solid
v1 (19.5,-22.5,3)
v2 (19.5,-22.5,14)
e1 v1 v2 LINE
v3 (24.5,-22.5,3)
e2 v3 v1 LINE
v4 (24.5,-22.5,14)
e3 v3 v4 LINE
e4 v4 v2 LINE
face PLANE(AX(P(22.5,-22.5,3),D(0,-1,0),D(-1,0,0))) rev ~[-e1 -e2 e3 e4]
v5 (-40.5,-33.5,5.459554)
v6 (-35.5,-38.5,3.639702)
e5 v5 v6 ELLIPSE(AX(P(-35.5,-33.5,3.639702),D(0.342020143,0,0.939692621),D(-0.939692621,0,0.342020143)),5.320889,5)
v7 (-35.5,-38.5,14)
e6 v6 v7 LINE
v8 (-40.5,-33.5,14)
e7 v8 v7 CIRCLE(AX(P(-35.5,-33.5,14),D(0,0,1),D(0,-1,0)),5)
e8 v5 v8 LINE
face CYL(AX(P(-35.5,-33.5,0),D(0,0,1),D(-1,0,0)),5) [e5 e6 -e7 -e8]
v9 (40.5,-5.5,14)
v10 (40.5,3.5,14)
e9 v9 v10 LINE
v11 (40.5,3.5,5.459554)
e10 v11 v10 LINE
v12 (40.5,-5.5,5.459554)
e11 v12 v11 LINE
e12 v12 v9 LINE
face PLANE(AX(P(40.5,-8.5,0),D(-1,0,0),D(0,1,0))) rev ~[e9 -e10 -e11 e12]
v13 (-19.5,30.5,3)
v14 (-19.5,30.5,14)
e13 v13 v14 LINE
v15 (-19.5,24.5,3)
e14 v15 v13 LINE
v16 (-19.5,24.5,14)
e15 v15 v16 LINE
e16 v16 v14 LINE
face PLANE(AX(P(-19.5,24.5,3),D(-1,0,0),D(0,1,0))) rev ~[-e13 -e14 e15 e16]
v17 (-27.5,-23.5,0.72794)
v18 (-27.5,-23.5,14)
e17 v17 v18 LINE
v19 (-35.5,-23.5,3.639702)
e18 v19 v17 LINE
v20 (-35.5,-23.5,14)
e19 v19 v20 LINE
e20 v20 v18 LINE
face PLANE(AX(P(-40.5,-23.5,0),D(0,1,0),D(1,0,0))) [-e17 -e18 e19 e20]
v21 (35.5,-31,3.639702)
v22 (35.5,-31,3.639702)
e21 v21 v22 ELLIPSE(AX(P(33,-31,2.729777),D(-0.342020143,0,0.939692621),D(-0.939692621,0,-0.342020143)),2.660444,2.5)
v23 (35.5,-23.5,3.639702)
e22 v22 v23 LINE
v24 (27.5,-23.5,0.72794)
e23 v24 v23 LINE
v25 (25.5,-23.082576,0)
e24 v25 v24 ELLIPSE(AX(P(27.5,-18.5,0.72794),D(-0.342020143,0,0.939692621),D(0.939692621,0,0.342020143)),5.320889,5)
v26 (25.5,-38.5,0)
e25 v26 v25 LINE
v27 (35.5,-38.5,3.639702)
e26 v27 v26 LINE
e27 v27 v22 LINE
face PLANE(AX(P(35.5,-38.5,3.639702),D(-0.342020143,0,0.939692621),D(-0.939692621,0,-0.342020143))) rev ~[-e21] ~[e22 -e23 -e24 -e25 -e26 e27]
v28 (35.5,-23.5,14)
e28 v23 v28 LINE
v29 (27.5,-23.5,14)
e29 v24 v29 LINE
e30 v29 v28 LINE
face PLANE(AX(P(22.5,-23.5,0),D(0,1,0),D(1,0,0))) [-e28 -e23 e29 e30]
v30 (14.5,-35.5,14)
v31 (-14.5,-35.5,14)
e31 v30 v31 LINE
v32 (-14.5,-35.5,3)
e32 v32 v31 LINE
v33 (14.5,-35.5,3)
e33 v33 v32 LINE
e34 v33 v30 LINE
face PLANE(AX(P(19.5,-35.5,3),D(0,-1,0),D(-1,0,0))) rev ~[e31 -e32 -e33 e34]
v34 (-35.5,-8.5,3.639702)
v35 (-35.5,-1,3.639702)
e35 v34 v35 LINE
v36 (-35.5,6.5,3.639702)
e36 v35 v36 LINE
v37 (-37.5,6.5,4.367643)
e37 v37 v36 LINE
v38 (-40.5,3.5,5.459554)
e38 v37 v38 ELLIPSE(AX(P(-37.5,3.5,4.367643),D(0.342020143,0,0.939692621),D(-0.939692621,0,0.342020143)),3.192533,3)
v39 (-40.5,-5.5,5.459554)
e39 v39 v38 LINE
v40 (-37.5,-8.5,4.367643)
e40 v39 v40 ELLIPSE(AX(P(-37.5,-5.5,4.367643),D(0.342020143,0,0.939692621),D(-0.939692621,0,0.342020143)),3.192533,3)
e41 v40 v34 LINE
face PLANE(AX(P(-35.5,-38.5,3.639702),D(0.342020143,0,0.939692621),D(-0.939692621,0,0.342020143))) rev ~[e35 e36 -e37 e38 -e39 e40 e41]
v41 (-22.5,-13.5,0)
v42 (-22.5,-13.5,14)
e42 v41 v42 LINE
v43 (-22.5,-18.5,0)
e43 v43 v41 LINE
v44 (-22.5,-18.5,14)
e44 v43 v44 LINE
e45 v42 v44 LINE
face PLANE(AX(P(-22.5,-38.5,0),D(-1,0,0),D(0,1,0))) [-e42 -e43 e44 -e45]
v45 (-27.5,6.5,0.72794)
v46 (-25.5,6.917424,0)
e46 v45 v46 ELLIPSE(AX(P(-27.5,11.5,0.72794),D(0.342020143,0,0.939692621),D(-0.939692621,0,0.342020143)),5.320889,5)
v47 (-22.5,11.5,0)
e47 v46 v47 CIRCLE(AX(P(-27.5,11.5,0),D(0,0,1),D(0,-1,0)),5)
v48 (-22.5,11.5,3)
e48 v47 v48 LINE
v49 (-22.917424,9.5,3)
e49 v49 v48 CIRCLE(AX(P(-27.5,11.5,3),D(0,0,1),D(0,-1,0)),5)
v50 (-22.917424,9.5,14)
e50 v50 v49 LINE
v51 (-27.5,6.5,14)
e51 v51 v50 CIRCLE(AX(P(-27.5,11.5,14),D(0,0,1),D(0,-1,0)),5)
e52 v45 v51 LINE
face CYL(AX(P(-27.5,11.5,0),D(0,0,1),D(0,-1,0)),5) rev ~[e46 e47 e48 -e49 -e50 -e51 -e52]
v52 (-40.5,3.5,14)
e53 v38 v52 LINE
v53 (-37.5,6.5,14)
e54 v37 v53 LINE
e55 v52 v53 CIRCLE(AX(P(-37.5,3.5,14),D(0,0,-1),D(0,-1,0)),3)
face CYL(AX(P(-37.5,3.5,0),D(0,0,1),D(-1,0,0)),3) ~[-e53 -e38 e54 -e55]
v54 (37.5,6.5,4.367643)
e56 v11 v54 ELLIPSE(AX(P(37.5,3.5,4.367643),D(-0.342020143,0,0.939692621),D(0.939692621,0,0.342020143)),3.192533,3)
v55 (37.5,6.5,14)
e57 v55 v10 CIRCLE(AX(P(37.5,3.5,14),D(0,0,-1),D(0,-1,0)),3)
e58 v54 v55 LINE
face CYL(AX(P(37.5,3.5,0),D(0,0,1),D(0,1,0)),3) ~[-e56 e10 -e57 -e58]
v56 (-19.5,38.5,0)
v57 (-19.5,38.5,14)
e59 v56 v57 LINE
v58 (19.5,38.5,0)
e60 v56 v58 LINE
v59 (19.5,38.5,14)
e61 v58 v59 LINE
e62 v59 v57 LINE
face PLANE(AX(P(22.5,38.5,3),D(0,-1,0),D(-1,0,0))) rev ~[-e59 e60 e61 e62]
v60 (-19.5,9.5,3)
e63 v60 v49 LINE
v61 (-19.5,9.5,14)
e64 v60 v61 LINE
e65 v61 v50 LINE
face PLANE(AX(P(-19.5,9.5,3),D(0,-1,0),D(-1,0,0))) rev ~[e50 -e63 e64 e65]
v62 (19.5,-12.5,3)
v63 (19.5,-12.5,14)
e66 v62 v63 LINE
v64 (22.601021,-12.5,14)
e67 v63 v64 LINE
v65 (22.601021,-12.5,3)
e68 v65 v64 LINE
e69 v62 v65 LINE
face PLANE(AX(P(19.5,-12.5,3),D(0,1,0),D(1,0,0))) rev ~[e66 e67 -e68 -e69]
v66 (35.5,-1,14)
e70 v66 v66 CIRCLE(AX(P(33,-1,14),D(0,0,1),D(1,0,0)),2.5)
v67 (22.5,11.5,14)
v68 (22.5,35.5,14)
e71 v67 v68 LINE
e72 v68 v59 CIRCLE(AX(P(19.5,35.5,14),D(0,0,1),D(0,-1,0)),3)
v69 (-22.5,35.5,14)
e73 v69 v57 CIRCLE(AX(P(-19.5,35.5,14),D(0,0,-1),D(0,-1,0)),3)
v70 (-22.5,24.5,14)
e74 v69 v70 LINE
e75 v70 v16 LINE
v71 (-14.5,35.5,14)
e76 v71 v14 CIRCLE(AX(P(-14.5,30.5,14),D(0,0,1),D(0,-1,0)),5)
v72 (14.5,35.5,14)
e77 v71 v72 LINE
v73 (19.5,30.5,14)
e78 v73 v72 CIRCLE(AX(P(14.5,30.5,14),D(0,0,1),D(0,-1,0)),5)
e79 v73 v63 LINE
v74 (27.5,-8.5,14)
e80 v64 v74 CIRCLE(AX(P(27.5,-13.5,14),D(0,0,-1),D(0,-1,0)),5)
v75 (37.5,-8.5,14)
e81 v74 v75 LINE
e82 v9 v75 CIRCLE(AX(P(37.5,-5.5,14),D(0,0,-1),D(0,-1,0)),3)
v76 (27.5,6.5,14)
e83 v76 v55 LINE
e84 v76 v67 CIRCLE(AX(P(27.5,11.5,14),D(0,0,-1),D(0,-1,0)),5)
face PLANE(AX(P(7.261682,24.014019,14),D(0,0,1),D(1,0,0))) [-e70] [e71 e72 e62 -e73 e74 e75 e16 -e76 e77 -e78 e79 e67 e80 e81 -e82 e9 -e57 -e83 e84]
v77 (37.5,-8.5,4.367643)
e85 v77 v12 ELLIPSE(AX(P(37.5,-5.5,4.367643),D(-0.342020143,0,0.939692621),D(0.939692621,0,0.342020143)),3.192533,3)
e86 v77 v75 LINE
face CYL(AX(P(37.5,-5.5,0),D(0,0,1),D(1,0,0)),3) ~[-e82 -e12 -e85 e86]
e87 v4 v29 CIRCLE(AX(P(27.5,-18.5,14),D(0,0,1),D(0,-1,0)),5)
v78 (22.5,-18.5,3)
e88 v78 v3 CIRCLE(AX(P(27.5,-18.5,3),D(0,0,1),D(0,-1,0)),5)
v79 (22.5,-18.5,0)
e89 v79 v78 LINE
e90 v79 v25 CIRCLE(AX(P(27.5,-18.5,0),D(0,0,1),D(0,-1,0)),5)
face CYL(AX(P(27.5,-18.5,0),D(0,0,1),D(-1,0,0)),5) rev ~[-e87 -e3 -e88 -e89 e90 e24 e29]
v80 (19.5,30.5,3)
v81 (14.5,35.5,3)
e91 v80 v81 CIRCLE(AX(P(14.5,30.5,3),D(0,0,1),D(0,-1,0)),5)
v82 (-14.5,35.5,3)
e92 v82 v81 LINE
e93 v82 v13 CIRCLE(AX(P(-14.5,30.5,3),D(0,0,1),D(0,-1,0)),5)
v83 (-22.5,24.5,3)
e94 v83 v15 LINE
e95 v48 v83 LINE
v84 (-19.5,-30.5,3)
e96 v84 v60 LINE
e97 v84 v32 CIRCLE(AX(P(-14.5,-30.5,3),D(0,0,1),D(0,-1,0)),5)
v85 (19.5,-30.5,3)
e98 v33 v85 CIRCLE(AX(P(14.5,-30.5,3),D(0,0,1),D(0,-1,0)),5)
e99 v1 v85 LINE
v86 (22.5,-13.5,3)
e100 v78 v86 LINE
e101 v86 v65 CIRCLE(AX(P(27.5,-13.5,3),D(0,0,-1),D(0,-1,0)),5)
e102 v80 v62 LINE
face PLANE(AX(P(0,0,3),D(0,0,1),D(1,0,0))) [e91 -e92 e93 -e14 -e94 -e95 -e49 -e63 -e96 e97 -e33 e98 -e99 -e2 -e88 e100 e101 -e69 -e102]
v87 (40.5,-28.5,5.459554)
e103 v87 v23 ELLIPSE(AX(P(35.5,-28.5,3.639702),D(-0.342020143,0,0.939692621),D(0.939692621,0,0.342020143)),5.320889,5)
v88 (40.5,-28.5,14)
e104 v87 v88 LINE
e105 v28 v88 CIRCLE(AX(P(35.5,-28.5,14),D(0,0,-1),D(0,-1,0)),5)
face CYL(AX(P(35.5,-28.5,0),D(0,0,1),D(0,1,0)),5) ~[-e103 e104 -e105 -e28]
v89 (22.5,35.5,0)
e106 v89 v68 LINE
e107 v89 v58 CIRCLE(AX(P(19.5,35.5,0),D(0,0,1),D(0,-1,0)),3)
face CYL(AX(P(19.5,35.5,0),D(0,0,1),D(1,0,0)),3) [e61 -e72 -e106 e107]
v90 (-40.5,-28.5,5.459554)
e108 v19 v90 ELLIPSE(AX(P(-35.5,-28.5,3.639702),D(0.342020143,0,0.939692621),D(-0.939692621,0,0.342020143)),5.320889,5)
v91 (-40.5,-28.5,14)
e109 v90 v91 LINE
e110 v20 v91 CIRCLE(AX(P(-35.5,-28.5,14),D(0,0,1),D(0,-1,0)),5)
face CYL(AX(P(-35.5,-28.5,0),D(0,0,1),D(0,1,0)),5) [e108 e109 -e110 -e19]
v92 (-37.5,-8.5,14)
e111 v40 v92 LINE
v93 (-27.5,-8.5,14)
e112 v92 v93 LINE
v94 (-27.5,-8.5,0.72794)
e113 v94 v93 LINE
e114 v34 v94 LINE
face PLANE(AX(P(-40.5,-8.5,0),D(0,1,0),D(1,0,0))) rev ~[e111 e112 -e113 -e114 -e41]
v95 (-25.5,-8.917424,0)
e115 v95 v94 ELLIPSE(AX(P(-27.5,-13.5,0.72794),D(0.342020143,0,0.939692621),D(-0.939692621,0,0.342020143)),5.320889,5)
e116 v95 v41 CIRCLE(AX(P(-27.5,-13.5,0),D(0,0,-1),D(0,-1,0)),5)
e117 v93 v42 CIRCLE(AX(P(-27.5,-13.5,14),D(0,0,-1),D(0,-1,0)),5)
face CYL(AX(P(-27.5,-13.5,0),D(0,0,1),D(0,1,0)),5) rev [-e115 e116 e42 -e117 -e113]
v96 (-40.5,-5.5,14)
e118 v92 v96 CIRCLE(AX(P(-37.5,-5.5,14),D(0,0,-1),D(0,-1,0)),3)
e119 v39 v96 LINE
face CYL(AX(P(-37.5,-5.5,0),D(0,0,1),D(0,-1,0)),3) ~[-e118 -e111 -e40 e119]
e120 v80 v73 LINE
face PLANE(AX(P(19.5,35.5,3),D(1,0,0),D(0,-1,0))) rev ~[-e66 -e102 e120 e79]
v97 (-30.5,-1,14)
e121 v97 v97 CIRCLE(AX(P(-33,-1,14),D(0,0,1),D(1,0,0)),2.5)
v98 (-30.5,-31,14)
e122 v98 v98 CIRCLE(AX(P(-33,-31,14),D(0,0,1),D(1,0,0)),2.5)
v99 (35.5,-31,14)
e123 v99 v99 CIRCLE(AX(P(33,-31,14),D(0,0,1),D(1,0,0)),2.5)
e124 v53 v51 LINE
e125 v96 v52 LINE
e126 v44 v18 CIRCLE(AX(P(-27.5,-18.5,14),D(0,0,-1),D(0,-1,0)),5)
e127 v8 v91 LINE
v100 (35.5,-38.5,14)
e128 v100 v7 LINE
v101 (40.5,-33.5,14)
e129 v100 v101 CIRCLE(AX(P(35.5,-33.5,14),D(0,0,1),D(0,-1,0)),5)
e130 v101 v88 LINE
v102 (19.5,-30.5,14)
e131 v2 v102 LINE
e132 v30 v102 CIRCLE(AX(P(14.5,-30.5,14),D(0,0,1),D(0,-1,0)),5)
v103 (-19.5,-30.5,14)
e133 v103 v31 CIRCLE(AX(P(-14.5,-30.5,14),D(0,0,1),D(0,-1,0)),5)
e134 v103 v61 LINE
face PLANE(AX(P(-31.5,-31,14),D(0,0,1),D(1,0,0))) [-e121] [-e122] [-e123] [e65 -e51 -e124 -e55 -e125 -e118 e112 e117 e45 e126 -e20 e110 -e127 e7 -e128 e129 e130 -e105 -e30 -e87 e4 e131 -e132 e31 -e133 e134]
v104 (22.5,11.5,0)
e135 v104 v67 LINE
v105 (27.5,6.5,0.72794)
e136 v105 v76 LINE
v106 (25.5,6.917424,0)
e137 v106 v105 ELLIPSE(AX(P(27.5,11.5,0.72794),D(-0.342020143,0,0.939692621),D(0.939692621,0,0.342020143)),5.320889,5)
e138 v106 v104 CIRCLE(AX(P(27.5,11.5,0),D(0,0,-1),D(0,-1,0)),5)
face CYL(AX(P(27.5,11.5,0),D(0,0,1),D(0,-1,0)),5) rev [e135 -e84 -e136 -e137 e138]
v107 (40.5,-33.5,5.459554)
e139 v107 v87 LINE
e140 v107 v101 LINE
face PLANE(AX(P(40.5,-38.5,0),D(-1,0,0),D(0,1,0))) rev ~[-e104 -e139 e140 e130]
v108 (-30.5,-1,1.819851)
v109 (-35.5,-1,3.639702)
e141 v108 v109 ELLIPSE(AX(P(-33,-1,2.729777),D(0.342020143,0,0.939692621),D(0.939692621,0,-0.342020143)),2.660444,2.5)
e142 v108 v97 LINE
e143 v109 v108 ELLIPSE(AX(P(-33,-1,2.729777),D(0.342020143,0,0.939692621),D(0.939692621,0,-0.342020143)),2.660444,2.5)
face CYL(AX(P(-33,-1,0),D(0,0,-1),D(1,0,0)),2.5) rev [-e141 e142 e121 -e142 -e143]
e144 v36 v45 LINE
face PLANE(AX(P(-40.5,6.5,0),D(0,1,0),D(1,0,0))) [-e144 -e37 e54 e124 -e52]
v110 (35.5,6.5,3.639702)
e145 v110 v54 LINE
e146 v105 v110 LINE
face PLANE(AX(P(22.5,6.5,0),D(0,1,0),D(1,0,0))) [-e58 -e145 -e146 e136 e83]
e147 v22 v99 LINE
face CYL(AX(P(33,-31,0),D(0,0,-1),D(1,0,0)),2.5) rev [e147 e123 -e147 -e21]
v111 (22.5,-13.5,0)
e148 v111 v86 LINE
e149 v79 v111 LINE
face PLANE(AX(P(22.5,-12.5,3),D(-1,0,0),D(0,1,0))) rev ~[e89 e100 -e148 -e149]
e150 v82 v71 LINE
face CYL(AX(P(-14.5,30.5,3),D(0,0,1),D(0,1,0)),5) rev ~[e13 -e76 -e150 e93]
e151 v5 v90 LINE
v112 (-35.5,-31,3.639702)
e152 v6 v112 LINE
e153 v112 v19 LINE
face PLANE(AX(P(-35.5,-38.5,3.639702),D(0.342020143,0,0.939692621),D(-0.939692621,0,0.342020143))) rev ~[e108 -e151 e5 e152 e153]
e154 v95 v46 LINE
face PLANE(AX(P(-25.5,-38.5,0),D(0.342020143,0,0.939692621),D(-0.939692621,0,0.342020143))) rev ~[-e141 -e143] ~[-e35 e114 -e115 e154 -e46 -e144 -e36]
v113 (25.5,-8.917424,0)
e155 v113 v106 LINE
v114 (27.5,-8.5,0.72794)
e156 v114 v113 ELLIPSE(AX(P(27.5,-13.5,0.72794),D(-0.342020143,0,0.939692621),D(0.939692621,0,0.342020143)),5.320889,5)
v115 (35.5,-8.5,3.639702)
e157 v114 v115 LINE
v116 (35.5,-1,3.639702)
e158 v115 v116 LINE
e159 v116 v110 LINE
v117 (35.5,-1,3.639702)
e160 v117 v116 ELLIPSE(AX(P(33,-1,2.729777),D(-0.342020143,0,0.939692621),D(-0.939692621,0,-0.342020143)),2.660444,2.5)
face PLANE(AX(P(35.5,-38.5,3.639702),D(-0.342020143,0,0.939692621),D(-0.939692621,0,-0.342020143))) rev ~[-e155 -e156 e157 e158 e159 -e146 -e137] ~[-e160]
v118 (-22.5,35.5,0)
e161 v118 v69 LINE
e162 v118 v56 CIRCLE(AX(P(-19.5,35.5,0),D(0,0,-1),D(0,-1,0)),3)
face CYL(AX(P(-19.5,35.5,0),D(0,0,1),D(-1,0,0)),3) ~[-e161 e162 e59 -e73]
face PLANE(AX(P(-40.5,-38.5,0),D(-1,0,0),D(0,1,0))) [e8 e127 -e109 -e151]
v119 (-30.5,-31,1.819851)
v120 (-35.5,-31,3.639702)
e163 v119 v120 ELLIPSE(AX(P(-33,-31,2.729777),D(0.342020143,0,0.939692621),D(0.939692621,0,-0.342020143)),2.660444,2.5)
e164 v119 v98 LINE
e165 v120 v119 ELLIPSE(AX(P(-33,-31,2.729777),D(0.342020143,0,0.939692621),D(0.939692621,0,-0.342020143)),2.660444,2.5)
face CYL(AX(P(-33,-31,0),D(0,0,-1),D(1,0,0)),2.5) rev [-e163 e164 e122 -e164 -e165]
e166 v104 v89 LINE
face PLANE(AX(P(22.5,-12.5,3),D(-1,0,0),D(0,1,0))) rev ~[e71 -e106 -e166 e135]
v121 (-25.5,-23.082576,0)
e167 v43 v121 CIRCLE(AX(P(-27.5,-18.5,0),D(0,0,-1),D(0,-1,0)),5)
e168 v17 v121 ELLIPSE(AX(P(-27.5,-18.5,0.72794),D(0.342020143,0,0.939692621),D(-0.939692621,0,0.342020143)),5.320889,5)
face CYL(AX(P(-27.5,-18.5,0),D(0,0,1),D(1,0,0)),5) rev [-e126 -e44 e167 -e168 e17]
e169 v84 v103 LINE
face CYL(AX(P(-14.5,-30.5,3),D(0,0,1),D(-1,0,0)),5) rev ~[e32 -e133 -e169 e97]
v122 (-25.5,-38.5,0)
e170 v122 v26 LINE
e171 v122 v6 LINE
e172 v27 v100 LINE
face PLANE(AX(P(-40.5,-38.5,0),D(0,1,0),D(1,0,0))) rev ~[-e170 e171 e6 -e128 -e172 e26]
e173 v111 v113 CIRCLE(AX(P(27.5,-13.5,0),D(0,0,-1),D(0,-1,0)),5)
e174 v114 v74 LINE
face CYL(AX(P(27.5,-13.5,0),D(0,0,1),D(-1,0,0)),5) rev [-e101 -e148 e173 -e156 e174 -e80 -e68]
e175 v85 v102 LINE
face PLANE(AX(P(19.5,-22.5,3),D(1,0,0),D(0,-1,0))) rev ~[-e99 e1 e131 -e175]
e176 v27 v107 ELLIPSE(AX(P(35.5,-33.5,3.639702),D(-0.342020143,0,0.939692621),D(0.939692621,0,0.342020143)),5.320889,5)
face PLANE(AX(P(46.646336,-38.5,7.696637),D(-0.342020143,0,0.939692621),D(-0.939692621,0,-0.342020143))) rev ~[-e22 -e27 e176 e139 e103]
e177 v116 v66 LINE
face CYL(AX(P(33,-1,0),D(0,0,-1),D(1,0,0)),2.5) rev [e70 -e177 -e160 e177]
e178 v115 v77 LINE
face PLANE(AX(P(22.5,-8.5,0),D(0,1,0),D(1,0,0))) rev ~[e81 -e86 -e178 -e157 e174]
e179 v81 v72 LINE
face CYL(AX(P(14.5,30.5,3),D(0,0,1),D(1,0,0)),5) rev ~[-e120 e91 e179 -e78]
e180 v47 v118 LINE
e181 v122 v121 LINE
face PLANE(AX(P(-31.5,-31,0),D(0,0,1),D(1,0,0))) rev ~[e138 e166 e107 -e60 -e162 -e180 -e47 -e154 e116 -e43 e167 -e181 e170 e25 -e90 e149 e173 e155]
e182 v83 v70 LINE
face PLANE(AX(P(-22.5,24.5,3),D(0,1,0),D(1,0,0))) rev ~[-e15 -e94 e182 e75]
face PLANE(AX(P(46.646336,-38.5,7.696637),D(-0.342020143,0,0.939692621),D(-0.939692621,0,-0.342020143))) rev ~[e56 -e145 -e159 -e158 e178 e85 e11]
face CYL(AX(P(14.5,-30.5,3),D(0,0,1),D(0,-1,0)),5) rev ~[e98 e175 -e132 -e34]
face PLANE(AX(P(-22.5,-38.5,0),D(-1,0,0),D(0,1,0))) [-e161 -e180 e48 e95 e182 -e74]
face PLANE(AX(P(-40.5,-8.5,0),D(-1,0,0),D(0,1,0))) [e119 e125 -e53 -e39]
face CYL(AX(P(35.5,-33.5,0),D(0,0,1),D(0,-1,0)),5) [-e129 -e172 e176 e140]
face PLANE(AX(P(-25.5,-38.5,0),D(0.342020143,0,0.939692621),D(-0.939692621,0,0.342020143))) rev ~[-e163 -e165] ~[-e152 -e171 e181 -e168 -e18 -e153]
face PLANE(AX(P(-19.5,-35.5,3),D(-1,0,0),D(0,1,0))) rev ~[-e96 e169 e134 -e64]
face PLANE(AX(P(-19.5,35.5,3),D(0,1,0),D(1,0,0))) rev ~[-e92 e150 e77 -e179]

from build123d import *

# Parameters (mm, degrees)
F0_W      = 45
F0_H      = 77
F1_DEPTH  = 3
F4_DEPTH  = 11
F5_W      = 18
F5_H      = 15
F5_R      = 2.5
F6_DEPTH  = 14
F7_R      = 3
F8_R      = 5
F9_R      = 5
F11_DEPTH = 77.001


# Not quite as in the source:
# - a feature names something its author has since deleted; it is built from what else it names


with BuildPart() as f1:
    # F0 (on Top) → F1 (new body)
    with BuildSketch(Plane.XY):
        Rectangle(F0_W, F0_H)
    extrude(amount=F1_DEPTH)

    # F3 (on face) → F4 (join)
    with BuildSketch(Plane.XY.offset(3)):
        Polygon((19.5, -12.5), (22.5, -12.5), (22.5, 38.5), (-22.5, 38.5), (-22.5, 24.5), (-19.5, 24.5), (-19.5, 35.5), (19.5, 35.5), align=None)
        Polygon((22.5, -38.5), (22.5, -22.5), (19.5, -22.5), (19.5, -22.7520468089), (19.5, -35.5), (-19.5, -35.5), (-19.5, 9.5), (-22.5, 9.5), (-22.5, -38.5), align=None)
    extrude(amount=F4_DEPTH)

    # F5 (on Top) → F6 (join, through all)
    with BuildSketch(Plane.XY):
        with Locations((31.5, -1)):
            Rectangle(F5_W, F5_H)
        with Locations((33, -1)):
            Circle(F5_R, mode=Mode.SUBTRACT)
        with Locations((-31.5, -31)):
            Rectangle(F5_W, F5_H)
        with Locations((-33, -31)):
            Circle(F5_R, mode=Mode.SUBTRACT)
        with Locations((-31.5, -1)):
            Rectangle(F5_W, F5_H)
        with Locations((-33, -1)):
            Circle(F5_R, mode=Mode.SUBTRACT)
        with Locations((31.5, -31)):
            Rectangle(F5_W, F5_H)
        with Locations((33, -31)):
            Circle(F5_R, mode=Mode.SUBTRACT)
    extrude(amount=F6_DEPTH)

    # F7
    f7_edges = [f1.edges().sort_by_distance(p)[0] for p in [
        (-22.5, 38.5, 7),
        (22.5, 38.5, 7),
        (40.5, 6.5, 7),
        (40.5, -8.5, 7),
        (-40.5, 6.5, 7),
        (-40.5, -8.5, 7),
    ]]
    fillet(f7_edges, radius=F7_R)

    # F8
    f8_edges = [f1.edges().sort_by_distance(p)[0] for p in [
        (19.5, -35.5, 8.5),
        (-19.5, -35.5, 8.5),
        (19.5, 35.5, 8.5),
        (-19.5, 35.5, 8.5),
        (22.5, 6.5, 7),
        (22.5, -8.5, 7),
        (-22.5, -8.5, 7),
        (-22.5, 6.5, 7),
    ]]
    fillet(f8_edges, radius=F8_R)

    # F9
    f9_edges = [f1.edges().sort_by_distance(p)[0] for p in [
        (-40.5, -23.5, 7),
        (-22.5, -23.5, 7),
        (-40.5, -38.5, 7),
        (40.5, -38.5, 7),
        (40.5, -23.5, 7),
        (22.5, -23.5, 7),
    ]]
    fillet(f9_edges, radius=F9_R)

    # F10 (on face) → F11 (cut, through all)
    with BuildSketch(Plane.XZ.offset(38.5)):
        Polygon((-35.5, 0), (-25.5, 0), (-35.5, 3.6397023427), align=None)
        Polygon((-35.5, 0), (-35.5, 3.6397023427), (-49.4253699631, 8.7081225104), (-49.4253699631, 0), align=None)
        Polygon((35.5, 3.6397023427), (25.5, 0), (35.5, 0), align=None)
        Polygon((46.6463356366, 7.6966367355), (35.5, 3.6397023427), (35.5, 0), (46.6463356366, 0), align=None)
    extrude(amount=-F11_DEPTH, mode=Mode.SUBTRACT)


solid = f1.part
